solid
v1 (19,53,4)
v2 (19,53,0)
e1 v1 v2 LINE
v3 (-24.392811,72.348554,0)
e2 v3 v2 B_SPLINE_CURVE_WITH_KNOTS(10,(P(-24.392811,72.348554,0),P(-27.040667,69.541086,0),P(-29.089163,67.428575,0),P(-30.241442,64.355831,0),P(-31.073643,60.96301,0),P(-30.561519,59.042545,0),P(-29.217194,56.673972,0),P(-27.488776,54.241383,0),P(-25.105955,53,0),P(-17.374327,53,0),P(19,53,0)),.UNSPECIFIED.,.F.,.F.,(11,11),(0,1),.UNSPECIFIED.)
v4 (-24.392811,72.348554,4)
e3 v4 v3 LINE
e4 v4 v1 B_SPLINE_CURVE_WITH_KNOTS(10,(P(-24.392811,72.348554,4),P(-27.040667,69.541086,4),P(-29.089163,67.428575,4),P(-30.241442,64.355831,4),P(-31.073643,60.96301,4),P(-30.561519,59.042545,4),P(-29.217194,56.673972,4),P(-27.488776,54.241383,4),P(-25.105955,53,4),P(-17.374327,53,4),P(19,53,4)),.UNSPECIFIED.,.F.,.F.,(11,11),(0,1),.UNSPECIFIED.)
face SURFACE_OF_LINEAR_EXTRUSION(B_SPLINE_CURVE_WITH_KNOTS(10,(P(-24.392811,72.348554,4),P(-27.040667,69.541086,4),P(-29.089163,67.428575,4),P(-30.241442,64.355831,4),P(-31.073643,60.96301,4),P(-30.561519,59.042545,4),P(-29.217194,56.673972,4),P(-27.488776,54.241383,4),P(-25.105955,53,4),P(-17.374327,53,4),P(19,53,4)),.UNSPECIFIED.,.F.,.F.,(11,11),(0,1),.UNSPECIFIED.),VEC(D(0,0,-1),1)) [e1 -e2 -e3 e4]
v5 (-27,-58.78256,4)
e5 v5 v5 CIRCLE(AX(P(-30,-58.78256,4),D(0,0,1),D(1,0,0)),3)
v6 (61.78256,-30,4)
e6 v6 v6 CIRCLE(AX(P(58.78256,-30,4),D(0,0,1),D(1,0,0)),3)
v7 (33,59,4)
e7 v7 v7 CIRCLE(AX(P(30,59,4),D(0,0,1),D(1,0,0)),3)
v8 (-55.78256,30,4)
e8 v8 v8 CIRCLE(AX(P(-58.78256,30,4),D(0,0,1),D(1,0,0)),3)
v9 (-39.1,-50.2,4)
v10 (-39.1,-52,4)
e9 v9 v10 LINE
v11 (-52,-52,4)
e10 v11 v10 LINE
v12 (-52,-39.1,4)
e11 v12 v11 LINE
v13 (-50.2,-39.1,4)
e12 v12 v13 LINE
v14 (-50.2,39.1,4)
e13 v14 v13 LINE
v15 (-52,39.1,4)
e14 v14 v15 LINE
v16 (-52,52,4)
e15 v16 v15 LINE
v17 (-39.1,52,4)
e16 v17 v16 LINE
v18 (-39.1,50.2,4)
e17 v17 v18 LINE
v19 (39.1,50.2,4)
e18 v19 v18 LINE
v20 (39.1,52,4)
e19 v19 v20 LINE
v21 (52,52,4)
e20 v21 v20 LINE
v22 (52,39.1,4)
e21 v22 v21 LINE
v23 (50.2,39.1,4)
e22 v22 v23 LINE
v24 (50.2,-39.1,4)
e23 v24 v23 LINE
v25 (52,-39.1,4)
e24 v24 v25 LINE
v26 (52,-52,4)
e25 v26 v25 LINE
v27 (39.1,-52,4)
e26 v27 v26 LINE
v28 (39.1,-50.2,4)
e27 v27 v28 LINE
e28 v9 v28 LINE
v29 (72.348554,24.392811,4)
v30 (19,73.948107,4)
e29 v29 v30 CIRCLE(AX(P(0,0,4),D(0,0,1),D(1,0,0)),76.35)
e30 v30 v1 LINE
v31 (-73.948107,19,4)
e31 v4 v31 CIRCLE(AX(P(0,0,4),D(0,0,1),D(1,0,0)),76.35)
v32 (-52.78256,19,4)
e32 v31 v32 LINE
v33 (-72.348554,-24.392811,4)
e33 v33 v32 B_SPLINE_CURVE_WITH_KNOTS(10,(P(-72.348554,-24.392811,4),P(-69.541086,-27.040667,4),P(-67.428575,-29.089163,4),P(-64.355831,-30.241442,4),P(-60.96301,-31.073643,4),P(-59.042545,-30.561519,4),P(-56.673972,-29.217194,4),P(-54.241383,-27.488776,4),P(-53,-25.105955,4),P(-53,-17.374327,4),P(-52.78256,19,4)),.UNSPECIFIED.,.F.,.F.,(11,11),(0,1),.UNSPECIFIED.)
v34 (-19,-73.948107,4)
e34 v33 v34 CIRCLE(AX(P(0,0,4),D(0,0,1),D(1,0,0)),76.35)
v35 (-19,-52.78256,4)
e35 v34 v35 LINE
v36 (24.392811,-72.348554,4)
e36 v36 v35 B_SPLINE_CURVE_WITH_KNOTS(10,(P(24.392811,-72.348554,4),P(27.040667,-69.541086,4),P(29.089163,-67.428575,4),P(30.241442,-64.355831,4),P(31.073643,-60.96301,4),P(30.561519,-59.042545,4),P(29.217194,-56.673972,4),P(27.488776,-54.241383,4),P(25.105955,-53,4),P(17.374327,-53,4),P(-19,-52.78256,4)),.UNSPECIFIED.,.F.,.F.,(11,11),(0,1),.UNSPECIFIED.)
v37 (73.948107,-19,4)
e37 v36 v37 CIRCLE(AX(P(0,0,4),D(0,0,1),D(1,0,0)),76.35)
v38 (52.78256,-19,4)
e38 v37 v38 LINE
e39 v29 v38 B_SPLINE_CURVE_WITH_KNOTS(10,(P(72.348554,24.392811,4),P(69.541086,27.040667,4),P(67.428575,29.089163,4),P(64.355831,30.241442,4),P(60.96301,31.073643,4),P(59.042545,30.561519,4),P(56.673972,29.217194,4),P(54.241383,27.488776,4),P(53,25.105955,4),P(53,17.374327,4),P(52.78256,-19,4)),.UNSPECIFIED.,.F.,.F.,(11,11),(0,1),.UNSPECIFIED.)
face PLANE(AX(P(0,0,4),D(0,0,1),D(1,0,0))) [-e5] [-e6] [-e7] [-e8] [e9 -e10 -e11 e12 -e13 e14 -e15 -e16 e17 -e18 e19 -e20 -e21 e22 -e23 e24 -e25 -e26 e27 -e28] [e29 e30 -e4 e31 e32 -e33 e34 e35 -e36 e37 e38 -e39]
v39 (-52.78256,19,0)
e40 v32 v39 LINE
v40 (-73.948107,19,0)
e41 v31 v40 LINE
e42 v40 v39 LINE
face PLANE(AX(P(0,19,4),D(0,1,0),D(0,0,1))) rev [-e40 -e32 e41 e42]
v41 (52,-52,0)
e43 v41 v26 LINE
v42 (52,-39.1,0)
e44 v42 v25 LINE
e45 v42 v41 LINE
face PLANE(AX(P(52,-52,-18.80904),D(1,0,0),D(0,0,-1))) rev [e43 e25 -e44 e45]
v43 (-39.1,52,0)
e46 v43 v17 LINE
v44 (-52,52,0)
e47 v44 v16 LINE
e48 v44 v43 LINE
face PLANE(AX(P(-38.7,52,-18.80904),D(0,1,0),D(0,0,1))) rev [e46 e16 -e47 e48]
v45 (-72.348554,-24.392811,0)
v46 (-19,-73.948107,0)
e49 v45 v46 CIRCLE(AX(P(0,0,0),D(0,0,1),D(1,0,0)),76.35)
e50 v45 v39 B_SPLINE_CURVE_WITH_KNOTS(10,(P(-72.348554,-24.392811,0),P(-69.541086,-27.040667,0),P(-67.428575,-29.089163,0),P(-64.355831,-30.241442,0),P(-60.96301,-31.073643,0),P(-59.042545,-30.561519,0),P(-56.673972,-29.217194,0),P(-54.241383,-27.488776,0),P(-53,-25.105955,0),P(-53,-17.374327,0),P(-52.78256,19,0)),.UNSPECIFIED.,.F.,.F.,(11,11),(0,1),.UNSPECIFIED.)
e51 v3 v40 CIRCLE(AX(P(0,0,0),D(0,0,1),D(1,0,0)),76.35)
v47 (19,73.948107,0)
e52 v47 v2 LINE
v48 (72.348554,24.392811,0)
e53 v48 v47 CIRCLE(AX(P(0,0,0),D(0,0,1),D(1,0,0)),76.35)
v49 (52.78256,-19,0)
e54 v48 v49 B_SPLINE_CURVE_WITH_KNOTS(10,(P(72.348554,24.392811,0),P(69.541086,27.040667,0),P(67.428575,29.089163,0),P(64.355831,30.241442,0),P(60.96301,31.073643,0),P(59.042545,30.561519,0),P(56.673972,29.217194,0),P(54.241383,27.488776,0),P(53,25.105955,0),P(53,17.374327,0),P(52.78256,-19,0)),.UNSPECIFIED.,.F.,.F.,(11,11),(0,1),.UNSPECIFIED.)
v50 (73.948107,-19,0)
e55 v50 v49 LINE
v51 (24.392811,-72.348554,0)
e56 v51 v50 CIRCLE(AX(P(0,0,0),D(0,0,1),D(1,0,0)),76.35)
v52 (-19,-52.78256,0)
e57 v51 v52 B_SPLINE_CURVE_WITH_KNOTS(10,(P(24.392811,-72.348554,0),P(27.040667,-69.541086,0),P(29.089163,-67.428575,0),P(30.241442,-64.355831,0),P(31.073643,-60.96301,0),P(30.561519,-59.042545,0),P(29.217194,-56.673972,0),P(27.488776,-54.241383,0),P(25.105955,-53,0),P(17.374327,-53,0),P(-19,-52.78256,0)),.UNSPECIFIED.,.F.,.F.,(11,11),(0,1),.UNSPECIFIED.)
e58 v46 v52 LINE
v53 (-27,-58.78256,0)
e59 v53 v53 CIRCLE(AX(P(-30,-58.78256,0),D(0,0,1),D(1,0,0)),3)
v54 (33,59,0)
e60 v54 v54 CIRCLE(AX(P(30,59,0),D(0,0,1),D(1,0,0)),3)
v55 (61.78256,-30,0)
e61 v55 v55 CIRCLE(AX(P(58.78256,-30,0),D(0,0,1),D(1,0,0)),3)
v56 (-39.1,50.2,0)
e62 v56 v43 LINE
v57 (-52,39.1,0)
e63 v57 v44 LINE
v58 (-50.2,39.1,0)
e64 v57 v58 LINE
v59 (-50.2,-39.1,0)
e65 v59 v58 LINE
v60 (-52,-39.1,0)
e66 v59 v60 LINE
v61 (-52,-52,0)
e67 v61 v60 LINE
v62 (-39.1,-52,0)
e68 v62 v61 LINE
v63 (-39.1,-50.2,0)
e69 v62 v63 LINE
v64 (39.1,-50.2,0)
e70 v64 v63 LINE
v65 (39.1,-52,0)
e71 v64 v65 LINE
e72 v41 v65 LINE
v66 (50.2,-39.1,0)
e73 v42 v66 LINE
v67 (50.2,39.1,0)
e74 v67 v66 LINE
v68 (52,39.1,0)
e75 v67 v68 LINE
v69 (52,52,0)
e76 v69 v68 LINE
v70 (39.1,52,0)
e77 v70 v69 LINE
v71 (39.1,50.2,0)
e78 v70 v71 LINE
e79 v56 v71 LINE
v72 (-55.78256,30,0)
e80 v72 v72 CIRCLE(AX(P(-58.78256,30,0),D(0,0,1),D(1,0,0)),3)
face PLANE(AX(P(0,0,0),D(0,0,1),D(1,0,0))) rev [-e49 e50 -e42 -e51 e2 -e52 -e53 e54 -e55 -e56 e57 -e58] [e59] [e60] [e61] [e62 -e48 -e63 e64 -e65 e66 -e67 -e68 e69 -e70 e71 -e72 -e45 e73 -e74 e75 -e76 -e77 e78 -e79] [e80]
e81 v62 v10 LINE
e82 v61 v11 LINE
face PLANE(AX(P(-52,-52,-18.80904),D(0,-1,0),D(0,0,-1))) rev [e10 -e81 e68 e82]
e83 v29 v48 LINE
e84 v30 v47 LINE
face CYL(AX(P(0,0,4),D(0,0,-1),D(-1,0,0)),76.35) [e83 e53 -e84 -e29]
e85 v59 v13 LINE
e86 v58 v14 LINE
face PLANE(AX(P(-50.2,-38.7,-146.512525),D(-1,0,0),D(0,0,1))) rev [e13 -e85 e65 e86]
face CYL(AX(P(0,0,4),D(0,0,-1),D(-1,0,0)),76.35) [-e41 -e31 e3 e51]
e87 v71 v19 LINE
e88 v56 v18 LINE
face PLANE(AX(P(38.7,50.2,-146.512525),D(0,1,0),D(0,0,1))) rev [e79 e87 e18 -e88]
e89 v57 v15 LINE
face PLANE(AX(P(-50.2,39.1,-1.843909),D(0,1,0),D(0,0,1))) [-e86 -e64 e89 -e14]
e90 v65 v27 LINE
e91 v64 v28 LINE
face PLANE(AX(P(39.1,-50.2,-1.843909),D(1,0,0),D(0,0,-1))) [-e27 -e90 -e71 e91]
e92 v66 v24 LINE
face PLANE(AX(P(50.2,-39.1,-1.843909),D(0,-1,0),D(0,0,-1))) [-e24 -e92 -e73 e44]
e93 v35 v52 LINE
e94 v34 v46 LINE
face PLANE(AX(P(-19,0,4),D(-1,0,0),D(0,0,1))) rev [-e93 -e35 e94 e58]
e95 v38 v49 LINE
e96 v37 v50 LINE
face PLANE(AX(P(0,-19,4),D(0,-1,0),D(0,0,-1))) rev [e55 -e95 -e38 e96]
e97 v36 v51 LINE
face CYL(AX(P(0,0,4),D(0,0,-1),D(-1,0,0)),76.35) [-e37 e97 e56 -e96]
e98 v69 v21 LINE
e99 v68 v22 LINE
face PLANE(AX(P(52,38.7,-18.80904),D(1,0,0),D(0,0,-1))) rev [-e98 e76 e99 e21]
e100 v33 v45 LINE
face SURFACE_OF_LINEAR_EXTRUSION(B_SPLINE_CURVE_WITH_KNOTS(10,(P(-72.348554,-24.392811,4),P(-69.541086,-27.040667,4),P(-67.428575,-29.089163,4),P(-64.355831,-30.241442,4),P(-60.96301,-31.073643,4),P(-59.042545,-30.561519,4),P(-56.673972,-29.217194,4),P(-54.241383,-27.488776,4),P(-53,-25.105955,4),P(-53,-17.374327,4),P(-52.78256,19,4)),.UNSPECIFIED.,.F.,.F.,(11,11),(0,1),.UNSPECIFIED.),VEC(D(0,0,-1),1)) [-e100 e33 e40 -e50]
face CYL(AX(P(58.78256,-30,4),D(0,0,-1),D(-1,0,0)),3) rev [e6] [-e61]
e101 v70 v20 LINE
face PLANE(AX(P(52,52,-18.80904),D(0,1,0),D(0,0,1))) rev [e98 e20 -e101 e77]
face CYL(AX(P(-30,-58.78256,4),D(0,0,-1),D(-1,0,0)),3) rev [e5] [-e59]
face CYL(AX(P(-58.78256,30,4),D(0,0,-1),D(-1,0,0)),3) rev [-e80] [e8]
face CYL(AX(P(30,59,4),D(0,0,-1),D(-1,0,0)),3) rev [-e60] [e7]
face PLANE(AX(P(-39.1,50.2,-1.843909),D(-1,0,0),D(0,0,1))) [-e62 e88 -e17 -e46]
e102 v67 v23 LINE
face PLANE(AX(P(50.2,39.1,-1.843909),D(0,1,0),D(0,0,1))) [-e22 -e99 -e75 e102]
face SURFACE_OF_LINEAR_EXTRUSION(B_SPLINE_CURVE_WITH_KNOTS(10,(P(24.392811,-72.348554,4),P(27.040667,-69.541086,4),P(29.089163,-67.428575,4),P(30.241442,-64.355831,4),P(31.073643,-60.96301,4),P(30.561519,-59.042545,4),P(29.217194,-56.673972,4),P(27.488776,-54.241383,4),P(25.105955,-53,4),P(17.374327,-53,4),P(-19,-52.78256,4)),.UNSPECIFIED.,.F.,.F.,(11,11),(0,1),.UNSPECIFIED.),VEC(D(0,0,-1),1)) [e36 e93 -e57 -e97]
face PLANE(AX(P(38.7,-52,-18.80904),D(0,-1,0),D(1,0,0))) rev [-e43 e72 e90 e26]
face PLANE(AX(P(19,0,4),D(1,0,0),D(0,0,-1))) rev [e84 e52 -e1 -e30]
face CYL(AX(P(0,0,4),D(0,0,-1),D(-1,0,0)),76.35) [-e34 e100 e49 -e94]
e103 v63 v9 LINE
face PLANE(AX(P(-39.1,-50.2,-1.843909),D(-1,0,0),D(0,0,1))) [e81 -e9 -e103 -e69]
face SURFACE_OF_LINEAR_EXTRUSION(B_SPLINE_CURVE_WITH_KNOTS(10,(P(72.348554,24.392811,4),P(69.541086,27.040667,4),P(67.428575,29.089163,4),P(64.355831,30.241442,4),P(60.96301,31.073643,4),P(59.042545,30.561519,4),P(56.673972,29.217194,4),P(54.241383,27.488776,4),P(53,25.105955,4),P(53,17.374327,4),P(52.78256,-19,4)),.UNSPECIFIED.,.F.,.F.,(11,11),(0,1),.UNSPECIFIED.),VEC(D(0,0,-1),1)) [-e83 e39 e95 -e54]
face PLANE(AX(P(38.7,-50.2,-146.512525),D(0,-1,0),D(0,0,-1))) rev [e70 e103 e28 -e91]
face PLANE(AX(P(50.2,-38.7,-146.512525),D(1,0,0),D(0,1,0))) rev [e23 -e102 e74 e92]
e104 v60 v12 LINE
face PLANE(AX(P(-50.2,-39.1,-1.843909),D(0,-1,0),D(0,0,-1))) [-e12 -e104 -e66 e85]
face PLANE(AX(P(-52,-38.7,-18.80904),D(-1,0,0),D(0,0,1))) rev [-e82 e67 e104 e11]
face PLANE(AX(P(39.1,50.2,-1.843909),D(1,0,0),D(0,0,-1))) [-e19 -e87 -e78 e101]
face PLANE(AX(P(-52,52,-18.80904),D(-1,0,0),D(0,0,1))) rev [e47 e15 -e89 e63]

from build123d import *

# Parameters (mm, degrees)
BOSS_EXTRUDE3_OUTLINE_R = 3
BOSS_EXTRUDE3_DEPTH     = 4
CUT_EXTRUDE1_DEPTH      = 4
CUT_EXTRUDE2_DEPTH      = 4
SKETCH4_W               = 0.4
SKETCH4_H               = 1.8
SKETCH4_W_2             = 1.8
SKETCH4_H_2             = 0.4
BOSS_EXTRUDE4_DEPTH     = 4


# Read off the part's stored shape, not the designer's step: Boss-Extrude3
with BuildPart() as part:
    # Boss-Extrude3 outline → Boss-Extrude3 (new body)
    with BuildSketch(Plane.XY):
        with BuildLine():
            add(Edge.make_bspline(
                [(24.392810524, -72.348554199), (27.040667073, -69.541086329), (29.089162938, -67.428574969), (30.241441862, -64.355831171), (31.073643307, -60.963009895), (30.561519341, -59.042545022), (29.217193929, -56.673971678), (27.488775543, -54.241382838), (25.105954954, -53), (17.37432721, -53), (-19, -52.782560411)],
                knots=[0, 0, 0, 0, 0, 0, 0, 0, 0, 0, 0, 1, 1, 1, 1, 1, 1, 1, 1, 1, 1, 1], degree=10))
            ThreePointArc((24.392810524, -72.348554199), (55.939709188, -51.962211615), (73.948106805, -19))
            Line((73.948106805, -19), (52.782560411, -19))
            add(Edge.make_bspline(
                [(72.348554199, 24.392810524), (69.541086329, 27.040667073), (67.428574969, 29.089162938), (64.355831171, 30.241441862), (60.963009895, 31.073643307), (59.042545022, 30.561519341), (56.673971678, 29.217193929), (54.241382838, 27.488775543), (53, 25.105954954), (53, 17.37432721), (52.782560411, -19)],
                knots=[0, 0, 0, 0, 0, 0, 0, 0, 0, 0, 0, 1, 1, 1, 1, 1, 1, 1, 1, 1, 1, 1], degree=10))
            ThreePointArc((72.348554199, 24.392810524), (51.962211615, 55.939709188), (19, 73.948106805))
            Line((19, 73.948106805), (19, 53))
            add(Edge.make_bspline(
                [(-24.392810524, 72.348554199), (-27.040667073, 69.541086329), (-29.089162938, 67.428574969), (-30.241441862, 64.355831171), (-31.073643307, 60.963009895), (-30.561519341, 59.042545022), (-29.217193929, 56.673971678), (-27.488775543, 54.241382838), (-25.105954954, 53), (-17.37432721, 53), (19, 53)],
                knots=[0, 0, 0, 0, 0, 0, 0, 0, 0, 0, 0, 1, 1, 1, 1, 1, 1, 1, 1, 1, 1, 1], degree=10))
            ThreePointArc((-24.392810524, 72.348554199), (-55.939709188, 51.962211615), (-73.948106805, 19))
            Line((-73.948106805, 19), (-52.782560411, 19))
            add(Edge.make_bspline(
                [(-72.348554199, -24.392810524), (-69.541086329, -27.040667073), (-67.428574969, -29.089162938), (-64.355831171, -30.241441862), (-60.963009895, -31.073643307), (-59.042545022, -30.561519341), (-56.673971678, -29.217193929), (-54.241382838, -27.488775543), (-53, -25.105954954), (-53, -17.37432721), (-52.782560411, 19)],
                knots=[0, 0, 0, 0, 0, 0, 0, 0, 0, 0, 0, 1, 1, 1, 1, 1, 1, 1, 1, 1, 1, 1], degree=10))
            ThreePointArc((-72.348554199, -24.392810524), (-51.962211615, -55.939709188), (-19, -73.948106805))
            Line((-19, -73.948106805), (-19, -52.782560411))
        make_face()
        with Locations((-30, -58.782560411)):
            Circle(BOSS_EXTRUDE3_OUTLINE_R, mode=Mode.SUBTRACT)
        with Locations((58.782560411, -30)):
            Circle(BOSS_EXTRUDE3_OUTLINE_R, mode=Mode.SUBTRACT)
        with Locations((-58.782560411, 30)):
            Circle(BOSS_EXTRUDE3_OUTLINE_R, mode=Mode.SUBTRACT)
        Polygon((-38.9, -51.6), (-51.6, -51.6), (-51.6, -38.9), (-50, -38.9), (-50, 38.9), (-51.6, 38.9), (-51.6, 51.6), (-38.9, 51.6), (-38.9, 50), (38.9, 50), (38.9, 51.6), (51.6, 51.6), (51.6, 38.9), (50, 38.9), (50, -38.9), (51.6, -38.9), (51.6, -51.6), (38.9, -51.6), (38.9, -50), (-38.9, -50), align=None, mode=Mode.SUBTRACT)
        with Locations((30, 59)):
            Circle(BOSS_EXTRUDE3_OUTLINE_R, mode=Mode.SUBTRACT)
    extrude(amount=BOSS_EXTRUDE3_DEPTH)

    # Sketch2 → Cut-Extrude1 (cut)
    with BuildSketch(Plane.XY.offset(4)):
        Polygon((51.8, -38.7), (50.2, -38.7), (50.2, 38.7), (51.8, 38.7), (51.8, 51.8), (38.7, 51.8), (38.7, 50.2), (-38.7, 50.2), (-38.7, 51.8), (-51.8, 51.8), (-51.8, 38.7), (-50.2, 38.7), (-50.2, -38.7), (-51.8, -38.7), (-51.8, -51.8), (-38.7, -51.8), (-38.7, -50.2), (38.7, -50.2), (38.7, -51.8), (51.8, -51.8), align=None)
        Polygon((51.6, -38.9), (50, -38.9), (50, 38.9), (51.6, 38.9), (51.6, 51.6), (38.9, 51.6), (38.9, 50), (-38.9, 50), (-38.9, 51.6), (-51.6, 51.6), (-51.6, 38.9), (-50, 38.9), (-50, -38.9), (-51.6, -38.9), (-51.6, -51.6), (-38.9, -51.6), (-38.9, -50), (38.9, -50), (38.9, -51.6), (51.6, -51.6), align=None, mode=Mode.SUBTRACT)
    extrude(amount=-CUT_EXTRUDE1_DEPTH, mode=Mode.SUBTRACT)

    # Sketch3 → Cut-Extrude2 (cut)
    with BuildSketch(Plane.XY.offset(4)):
        Polygon((-51.8, -51.8), (-38.7, -51.8), (-38.7, -52), (-52, -52), (-52, -38.7), (-51.8, -38.7), align=None)
        Polygon((38.7, -51.8), (51.8, -51.8), (51.8, -38.7), (52, -38.7), (52, -52), (38.7, -52), align=None)
        Polygon((51.8, 38.7), (51.8, 51.8), (38.7, 51.8), (38.7, 52), (52, 52), (52, 38.7), align=None)
        Polygon((-51.8, 51.8), (-51.8, 38.7), (-52, 38.7), (-52, 52), (-38.7, 52), (-38.7, 51.8), align=None)
    extrude(amount=-CUT_EXTRUDE2_DEPTH, mode=Mode.SUBTRACT)

    # Sketch4 → Boss-Extrude4 (add)
    with BuildSketch(Plane.XY.offset(4)):
        with Locations((-38.9, 51.1)):
            Rectangle(SKETCH4_W, SKETCH4_H)
        with Locations((-51.1, 38.9)):
            Rectangle(SKETCH4_W_2, SKETCH4_H_2)
        with Locations((38.9, 51.1)):
            Rectangle(SKETCH4_W, SKETCH4_H)
        with Locations((51.1, 38.9)):
            Rectangle(SKETCH4_W_2, SKETCH4_H_2)
        with Locations((38.9, -51.1)):
            Rectangle(SKETCH4_W, SKETCH4_H)
        with Locations((51.1, -38.9)):
            Rectangle(SKETCH4_W_2, SKETCH4_H_2)
        with Locations((-51.1, -38.9)):
            Rectangle(SKETCH4_W_2, SKETCH4_H_2)
        with Locations((-38.9, -51.1)):
            Rectangle(SKETCH4_W, SKETCH4_H)
    extrude(amount=-BOSS_EXTRUDE4_DEPTH)


solid = part.part
